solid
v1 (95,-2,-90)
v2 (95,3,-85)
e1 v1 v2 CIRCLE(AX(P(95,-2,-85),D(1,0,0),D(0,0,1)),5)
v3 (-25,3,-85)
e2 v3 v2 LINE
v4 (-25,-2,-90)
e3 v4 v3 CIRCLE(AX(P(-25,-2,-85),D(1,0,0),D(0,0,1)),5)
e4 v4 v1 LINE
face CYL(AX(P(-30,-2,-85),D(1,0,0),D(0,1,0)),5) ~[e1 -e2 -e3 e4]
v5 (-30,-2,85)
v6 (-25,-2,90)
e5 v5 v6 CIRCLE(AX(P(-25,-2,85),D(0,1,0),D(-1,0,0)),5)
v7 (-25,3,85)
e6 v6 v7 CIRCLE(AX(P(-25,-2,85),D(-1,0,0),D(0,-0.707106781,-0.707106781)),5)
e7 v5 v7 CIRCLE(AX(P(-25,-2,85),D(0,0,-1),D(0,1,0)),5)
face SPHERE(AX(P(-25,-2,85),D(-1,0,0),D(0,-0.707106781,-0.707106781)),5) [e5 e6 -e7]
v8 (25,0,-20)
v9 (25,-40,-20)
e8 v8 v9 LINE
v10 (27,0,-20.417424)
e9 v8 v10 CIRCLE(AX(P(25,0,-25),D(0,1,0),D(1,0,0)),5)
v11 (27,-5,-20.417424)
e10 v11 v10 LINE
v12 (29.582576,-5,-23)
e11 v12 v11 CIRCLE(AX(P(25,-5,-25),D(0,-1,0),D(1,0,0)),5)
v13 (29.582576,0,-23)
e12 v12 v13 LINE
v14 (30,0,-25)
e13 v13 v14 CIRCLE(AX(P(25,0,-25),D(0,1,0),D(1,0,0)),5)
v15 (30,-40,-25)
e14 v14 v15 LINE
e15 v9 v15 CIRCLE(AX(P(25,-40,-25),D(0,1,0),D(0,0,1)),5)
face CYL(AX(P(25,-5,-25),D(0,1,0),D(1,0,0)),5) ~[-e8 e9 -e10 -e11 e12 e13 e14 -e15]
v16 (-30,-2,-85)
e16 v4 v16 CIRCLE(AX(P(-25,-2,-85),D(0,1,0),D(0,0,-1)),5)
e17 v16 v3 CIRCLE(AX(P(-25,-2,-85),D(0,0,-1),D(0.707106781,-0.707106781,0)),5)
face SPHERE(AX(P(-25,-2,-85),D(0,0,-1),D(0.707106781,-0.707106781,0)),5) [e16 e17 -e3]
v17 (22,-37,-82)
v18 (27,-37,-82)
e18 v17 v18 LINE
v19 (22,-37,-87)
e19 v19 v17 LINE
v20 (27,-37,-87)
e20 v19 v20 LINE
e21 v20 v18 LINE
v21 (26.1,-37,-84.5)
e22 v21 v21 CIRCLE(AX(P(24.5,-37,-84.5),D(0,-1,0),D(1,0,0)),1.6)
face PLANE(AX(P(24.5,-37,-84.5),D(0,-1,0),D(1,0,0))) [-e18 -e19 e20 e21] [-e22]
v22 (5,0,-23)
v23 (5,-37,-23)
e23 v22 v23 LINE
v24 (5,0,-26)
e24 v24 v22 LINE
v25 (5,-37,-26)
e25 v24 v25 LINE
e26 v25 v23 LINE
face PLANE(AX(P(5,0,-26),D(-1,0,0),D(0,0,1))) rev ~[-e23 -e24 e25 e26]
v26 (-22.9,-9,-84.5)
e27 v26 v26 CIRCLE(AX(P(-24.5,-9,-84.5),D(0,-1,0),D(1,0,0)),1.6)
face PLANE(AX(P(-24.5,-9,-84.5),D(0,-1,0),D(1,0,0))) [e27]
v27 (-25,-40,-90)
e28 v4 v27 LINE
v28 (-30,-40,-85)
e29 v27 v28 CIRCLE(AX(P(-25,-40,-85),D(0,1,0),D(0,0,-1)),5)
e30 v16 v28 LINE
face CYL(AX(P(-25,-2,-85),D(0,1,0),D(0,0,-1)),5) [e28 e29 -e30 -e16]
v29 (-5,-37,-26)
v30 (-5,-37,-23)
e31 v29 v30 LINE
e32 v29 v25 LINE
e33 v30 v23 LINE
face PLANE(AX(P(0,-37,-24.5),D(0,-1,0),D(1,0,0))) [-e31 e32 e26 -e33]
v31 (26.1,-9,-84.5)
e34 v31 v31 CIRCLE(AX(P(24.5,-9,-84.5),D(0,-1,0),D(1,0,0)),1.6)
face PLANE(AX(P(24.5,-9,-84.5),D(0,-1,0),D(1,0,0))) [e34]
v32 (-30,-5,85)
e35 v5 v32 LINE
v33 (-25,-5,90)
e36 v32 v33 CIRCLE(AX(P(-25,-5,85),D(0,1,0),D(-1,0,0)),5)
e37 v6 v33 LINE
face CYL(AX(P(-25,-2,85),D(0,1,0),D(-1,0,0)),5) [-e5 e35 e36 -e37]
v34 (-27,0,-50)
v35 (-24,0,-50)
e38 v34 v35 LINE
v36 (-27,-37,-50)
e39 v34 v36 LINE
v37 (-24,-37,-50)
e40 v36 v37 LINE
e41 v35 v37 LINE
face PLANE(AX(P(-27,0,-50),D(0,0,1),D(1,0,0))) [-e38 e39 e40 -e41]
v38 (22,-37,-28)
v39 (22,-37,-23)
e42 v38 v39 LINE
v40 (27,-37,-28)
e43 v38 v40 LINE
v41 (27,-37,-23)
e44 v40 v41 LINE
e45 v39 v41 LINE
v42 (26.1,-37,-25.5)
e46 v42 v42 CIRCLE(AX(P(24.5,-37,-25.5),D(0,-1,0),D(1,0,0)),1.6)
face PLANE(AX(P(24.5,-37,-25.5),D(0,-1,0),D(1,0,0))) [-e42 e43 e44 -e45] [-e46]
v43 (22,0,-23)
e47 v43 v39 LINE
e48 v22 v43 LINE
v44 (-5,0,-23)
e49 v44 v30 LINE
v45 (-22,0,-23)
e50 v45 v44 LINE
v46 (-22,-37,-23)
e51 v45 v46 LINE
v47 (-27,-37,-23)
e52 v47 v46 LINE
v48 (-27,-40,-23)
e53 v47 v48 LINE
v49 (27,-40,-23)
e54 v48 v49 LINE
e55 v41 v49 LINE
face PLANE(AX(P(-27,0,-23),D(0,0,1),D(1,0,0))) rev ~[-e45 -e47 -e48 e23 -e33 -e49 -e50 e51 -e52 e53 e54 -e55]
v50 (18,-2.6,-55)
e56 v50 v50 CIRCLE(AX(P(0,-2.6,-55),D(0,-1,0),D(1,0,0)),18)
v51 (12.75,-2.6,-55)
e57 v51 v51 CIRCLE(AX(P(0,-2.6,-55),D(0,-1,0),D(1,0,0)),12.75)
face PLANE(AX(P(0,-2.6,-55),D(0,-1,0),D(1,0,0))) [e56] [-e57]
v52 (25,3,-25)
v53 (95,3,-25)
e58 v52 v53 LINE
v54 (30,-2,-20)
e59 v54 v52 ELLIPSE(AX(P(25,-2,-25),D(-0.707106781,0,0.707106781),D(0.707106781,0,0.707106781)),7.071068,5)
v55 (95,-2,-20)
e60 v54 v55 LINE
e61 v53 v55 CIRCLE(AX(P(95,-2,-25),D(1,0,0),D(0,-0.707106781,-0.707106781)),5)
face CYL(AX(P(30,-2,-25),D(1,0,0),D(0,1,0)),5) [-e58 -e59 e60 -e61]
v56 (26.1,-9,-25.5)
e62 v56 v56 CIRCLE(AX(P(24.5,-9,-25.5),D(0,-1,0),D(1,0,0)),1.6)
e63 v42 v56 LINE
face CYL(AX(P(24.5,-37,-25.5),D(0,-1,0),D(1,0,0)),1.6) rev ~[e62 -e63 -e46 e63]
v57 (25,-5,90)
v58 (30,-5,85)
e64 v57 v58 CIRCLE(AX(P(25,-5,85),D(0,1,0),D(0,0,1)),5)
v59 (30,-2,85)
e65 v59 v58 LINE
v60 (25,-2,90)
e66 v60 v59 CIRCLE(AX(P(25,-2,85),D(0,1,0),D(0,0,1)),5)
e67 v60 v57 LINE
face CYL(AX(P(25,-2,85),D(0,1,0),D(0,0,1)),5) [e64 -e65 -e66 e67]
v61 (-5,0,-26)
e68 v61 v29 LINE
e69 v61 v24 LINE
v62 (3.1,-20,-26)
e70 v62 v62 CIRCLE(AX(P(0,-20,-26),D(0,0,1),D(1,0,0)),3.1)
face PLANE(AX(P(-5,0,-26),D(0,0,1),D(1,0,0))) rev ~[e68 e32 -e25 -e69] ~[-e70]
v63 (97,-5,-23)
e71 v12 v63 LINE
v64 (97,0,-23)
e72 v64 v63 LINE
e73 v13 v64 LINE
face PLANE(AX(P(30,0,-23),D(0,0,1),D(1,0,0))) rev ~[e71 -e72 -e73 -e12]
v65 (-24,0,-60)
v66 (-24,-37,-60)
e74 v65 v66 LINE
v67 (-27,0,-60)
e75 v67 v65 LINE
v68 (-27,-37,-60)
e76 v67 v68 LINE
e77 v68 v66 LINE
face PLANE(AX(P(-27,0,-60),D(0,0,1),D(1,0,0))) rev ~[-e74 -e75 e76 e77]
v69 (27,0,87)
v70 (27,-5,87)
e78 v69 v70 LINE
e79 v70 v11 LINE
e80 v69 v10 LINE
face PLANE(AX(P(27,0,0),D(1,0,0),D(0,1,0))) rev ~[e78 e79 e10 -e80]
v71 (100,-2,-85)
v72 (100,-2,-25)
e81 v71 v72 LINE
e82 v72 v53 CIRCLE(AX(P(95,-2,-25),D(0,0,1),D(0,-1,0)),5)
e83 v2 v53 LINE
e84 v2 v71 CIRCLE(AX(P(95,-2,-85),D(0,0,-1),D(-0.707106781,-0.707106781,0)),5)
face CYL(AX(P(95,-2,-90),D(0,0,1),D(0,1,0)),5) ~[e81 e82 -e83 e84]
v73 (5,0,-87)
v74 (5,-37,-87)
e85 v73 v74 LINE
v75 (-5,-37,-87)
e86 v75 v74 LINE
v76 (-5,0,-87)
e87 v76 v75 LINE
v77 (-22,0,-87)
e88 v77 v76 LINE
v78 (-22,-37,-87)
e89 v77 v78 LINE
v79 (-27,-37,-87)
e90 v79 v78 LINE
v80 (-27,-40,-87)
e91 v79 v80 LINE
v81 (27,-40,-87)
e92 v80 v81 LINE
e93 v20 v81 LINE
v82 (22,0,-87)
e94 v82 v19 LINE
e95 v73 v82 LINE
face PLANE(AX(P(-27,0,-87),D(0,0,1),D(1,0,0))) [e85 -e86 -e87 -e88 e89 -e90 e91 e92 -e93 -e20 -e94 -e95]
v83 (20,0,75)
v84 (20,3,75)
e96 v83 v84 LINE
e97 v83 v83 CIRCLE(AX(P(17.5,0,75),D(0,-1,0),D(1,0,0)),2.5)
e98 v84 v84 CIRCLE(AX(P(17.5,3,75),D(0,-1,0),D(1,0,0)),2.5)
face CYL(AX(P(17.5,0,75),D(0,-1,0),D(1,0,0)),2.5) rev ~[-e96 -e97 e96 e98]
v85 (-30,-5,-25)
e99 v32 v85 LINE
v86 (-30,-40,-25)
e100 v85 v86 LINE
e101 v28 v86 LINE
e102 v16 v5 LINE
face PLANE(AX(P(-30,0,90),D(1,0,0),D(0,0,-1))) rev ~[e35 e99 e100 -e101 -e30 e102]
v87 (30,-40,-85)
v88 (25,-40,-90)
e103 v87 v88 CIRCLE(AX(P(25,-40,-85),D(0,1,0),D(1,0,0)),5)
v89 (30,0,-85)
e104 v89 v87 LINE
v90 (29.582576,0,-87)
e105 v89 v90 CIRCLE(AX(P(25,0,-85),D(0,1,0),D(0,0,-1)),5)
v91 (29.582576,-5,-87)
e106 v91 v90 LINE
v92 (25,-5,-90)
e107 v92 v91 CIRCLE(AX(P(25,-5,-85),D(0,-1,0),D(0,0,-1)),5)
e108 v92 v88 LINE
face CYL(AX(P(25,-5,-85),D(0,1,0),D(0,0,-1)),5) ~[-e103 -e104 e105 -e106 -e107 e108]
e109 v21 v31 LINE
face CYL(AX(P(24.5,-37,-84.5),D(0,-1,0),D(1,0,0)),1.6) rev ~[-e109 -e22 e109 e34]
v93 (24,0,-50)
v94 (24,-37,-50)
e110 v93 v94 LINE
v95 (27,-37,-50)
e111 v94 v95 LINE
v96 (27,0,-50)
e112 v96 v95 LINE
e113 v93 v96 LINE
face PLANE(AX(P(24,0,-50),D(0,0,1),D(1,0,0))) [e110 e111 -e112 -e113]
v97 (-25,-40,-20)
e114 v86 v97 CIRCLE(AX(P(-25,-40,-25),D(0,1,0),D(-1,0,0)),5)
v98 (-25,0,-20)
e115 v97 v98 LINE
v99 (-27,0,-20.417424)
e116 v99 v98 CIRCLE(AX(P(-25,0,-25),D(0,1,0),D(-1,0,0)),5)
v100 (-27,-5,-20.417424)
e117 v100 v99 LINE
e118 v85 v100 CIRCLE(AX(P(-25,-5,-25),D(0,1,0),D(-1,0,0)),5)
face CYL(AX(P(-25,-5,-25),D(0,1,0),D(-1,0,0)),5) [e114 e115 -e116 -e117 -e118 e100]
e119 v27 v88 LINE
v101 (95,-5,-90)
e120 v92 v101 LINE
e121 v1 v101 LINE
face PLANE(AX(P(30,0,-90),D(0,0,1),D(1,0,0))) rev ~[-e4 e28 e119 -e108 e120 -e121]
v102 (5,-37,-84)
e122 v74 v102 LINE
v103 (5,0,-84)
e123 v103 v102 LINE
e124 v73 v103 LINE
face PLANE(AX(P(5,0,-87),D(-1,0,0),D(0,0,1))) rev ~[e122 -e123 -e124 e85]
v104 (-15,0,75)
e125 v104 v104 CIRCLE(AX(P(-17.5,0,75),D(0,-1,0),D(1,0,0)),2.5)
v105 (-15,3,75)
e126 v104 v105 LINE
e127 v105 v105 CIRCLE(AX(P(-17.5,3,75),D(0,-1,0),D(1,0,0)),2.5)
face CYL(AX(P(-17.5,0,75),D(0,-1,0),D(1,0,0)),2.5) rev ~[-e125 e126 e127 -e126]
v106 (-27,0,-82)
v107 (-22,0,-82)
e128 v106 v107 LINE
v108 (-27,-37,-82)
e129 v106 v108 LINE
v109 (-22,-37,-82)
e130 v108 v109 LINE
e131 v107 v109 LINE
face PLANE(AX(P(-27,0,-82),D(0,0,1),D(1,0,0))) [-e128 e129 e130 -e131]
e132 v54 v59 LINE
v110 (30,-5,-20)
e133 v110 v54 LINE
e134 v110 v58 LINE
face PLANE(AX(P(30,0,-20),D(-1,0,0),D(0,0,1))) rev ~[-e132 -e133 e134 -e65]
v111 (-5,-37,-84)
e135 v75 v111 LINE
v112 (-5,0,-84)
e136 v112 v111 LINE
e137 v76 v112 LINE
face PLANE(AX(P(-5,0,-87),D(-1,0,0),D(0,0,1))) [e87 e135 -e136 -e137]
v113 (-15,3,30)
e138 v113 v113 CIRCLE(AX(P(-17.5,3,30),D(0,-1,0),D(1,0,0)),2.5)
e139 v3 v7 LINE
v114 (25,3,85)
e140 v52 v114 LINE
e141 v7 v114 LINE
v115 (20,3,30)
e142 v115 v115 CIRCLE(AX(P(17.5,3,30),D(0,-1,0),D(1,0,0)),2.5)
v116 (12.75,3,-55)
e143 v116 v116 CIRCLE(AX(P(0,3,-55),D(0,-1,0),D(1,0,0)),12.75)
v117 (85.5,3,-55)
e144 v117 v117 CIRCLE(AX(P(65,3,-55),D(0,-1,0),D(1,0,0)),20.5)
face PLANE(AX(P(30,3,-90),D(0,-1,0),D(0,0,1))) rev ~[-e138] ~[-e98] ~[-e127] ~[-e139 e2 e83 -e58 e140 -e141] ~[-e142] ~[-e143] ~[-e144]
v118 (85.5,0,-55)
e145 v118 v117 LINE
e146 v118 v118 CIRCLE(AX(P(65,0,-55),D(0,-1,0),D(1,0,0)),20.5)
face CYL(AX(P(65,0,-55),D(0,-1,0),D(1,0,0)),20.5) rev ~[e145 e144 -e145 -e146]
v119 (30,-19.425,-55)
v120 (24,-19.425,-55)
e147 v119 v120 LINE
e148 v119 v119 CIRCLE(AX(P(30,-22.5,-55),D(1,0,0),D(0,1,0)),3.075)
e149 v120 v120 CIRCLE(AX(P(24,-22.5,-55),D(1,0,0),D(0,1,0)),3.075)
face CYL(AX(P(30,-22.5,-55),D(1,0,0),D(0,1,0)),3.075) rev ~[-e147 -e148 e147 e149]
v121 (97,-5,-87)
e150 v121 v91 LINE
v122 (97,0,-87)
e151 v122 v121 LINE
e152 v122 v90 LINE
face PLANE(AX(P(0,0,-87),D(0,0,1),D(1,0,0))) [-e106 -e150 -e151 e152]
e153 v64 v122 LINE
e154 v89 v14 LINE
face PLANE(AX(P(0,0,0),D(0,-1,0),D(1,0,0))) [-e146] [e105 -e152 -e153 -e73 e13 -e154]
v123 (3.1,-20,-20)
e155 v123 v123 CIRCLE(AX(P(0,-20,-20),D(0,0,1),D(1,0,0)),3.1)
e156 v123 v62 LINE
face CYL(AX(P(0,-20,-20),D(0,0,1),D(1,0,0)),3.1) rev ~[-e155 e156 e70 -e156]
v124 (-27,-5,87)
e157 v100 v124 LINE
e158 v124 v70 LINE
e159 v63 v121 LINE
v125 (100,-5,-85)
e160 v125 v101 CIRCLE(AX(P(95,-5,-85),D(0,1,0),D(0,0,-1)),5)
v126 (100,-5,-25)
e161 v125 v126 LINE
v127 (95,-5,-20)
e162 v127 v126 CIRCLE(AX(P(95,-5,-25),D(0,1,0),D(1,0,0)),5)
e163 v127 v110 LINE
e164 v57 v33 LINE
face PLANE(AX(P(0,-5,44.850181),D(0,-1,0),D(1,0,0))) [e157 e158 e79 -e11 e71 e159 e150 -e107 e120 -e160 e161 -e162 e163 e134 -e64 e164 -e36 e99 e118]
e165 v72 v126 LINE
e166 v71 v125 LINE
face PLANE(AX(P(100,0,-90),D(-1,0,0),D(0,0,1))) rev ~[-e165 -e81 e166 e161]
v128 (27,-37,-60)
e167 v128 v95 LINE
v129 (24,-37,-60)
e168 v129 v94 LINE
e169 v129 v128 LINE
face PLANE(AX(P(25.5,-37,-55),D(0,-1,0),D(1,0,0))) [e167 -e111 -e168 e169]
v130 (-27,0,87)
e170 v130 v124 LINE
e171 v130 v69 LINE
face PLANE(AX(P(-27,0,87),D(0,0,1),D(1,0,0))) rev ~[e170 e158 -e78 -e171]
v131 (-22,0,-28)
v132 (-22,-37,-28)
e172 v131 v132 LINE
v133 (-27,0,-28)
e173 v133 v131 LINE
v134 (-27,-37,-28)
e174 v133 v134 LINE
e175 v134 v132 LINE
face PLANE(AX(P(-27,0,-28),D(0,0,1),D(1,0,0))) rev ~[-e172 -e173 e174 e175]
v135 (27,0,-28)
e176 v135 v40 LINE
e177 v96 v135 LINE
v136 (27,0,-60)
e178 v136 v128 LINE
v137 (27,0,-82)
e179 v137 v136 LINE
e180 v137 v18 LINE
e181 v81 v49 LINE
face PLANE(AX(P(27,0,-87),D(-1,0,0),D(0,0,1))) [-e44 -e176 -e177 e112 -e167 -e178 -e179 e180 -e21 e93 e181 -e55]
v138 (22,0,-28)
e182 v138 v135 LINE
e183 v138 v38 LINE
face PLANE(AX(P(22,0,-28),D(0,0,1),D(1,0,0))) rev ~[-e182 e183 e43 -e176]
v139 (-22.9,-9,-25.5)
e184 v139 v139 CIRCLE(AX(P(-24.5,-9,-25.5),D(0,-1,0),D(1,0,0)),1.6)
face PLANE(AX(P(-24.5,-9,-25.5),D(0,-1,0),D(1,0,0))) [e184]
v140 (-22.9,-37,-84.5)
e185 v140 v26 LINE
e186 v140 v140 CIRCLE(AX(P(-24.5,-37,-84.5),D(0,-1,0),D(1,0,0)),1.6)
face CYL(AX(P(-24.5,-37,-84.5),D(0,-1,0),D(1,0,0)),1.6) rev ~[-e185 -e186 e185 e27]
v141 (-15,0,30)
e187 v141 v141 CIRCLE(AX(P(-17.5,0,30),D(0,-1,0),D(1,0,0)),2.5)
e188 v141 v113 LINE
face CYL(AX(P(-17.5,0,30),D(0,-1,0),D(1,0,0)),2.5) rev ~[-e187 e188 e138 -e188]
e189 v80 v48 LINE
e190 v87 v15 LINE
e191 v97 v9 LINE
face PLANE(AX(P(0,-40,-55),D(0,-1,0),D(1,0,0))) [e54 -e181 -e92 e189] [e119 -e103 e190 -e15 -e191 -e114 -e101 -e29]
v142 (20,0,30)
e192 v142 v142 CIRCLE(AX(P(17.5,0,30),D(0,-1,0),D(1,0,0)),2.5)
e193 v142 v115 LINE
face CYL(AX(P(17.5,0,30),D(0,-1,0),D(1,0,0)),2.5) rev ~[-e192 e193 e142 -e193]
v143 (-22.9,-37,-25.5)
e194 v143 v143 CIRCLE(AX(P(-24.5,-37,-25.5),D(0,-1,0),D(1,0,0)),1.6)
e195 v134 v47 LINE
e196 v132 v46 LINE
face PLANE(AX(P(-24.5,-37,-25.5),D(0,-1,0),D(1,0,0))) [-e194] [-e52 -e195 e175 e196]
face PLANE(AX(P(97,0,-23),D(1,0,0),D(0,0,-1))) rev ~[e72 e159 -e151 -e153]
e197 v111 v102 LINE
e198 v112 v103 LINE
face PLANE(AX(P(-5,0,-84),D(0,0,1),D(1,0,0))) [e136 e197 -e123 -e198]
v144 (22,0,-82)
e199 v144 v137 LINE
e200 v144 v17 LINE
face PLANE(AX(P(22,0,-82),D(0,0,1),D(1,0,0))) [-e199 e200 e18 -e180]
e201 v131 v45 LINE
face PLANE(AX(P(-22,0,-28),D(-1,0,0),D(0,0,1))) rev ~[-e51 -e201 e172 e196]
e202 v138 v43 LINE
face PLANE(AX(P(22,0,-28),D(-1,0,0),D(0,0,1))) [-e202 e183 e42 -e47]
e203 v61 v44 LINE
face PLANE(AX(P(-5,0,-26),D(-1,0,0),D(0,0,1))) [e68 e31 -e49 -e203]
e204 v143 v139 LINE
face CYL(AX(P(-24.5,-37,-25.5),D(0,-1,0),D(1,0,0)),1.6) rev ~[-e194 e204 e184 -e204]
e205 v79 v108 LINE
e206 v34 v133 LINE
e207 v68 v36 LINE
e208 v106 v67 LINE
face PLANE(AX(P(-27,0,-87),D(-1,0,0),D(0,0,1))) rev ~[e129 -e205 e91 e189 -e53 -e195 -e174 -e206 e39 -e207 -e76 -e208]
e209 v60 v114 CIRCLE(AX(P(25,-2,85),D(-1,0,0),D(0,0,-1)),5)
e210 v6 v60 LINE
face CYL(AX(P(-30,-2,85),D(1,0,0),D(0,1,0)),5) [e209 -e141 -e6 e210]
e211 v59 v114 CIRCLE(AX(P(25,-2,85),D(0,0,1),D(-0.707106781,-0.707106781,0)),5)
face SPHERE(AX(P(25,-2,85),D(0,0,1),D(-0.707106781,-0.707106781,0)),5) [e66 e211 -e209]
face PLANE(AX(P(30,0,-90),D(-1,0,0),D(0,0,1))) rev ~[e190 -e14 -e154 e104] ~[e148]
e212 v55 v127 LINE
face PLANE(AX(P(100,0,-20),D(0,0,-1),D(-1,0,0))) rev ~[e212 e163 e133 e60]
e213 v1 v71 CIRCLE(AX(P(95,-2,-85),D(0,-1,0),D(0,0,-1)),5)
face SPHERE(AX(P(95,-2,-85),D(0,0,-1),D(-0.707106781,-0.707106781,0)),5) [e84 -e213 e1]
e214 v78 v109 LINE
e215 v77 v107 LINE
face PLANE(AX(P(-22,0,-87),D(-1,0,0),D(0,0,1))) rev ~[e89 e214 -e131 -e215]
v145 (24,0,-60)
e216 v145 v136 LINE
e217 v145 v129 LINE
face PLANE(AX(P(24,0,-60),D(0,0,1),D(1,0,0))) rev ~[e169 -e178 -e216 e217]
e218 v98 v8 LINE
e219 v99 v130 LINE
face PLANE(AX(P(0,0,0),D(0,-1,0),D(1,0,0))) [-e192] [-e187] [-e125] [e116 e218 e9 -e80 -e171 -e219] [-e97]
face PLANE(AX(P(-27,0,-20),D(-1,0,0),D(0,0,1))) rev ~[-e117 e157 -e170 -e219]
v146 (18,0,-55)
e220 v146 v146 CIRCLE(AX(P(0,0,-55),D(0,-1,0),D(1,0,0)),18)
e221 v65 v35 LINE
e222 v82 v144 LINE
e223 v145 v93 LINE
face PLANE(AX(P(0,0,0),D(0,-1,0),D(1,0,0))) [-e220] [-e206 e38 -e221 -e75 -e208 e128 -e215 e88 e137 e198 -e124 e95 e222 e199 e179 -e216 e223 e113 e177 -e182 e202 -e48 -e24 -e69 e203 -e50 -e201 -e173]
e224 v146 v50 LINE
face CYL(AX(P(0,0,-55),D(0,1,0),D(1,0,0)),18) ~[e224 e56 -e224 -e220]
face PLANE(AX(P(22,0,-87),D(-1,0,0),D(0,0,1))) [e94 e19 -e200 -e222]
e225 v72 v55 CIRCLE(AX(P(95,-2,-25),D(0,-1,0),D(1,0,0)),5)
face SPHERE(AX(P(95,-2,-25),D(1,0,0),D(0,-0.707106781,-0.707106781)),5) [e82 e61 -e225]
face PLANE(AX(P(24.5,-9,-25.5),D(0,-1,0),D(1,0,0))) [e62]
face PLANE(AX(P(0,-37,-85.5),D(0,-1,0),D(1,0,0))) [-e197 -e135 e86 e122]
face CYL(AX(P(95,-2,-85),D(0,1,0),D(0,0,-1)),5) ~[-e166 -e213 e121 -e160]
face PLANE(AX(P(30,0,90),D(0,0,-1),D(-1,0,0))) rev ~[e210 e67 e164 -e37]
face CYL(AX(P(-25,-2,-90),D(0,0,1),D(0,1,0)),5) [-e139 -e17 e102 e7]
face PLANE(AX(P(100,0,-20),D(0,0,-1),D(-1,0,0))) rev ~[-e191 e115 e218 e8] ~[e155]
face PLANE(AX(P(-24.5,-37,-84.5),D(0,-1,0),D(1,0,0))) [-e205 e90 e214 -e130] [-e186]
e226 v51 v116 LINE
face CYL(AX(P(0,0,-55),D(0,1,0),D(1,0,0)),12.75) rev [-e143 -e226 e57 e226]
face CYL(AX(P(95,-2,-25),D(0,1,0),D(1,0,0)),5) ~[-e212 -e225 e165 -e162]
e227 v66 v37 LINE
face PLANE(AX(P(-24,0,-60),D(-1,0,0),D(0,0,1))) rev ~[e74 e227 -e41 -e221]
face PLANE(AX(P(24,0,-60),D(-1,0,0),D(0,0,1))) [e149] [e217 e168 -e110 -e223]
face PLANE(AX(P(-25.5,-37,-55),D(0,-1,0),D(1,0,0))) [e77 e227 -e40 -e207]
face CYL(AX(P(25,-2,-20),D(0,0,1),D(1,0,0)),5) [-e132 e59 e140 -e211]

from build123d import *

# Parameters (mm, degrees)
F0_W          = 60
F0_H          = 180
F0_R          = 12.75
F0_R_2        = 2.5
F1_DEPTH      = 3
F2_R          = 18
F2_R_2        = 12.75
F3_DEPTH      = 2.6
F4_W          = 60
F4_H          = 70
F4_W_2        = 54
F4_H_2        = 64
F5_DEPTH      = 40
F6_W          = 5
F6_H          = 5
F6_W_2        = 10
F6_H_2        = 3
F6_W_3        = 3
F6_H_3        = 10
F7_DEPTH      = 37
F8_R          = 1.6
F9_DEPTH      = 28
F10_W         = 3
F10_H         = 70
F11_DEPTH     = 70
F13_R         = 20.5
F14_DEPTH     = 3
F16_DEPTH     = 5
F17_R         = 3.075
F18_DEPTH     = 6
F19_R         = 3.1
F20_DEPTH     = 6
F22_DEPTH     = 5
F23_R         = 5
F24_T1_DEPTH  = 47.5
F24_T3_DEPTH  = 50.5
F24_T5_DEPTH  = 15.5
F24_S9_W      = 5.1
F24_S9_H      = 5.1
F24_T10_DEPTH = 5.1
F24_S15_W     = 5.1
F24_S15_H     = 5.1
F24_T16_DEPTH = 5.1
F24_S21_W     = 5.1
F24_S21_H     = 5.1
F24_T22_DEPTH = 5.1
F24_S27_W     = 5.1
F24_S27_H     = 5.1
F24_T28_DEPTH = 5.1
F24_S33_W     = 5.1
F24_S33_H     = 5.1
F24_T34_DEPTH = 5.1
F24_T40_DEPTH = 60
F24_T46_DEPTH = 60
F24_T52_DEPTH = 60
F24_T58_DEPTH = 60


# Not quite as in the source:
# - a fillet or chamfer that OpenCascade refuses, or shapes differently, is made with other operations: its cross-section is extruded or revolved along the edge and cut away or added


with BuildPart() as f1:
    # F0 (on Front) → F1 (new body)
    with BuildSketch(Plane.XZ):
        Rectangle(F0_W, F0_H)
        with Locations((0, -55)):
            Circle(F0_R, mode=Mode.SUBTRACT)
        with Locations((-17.5, 30)):
            Circle(F0_R_2, mode=Mode.SUBTRACT)
        with Locations((-17.5, 75)):
            Circle(F0_R_2, mode=Mode.SUBTRACT)
        with Locations((17.5, 30)):
            Circle(F0_R_2, mode=Mode.SUBTRACT)
        with Locations((17.5, 75)):
            Circle(F0_R_2, mode=Mode.SUBTRACT)
    extrude(amount=-F1_DEPTH)

    # F2 (on face) → F3 (join)
    with BuildSketch(Plane.XZ):
        with Locations((0, -55)):
            Circle(F2_R)
        with Locations((0, -55)):
            Circle(F2_R_2, mode=Mode.SUBTRACT)
    extrude(amount=F3_DEPTH)

    # F4 (on face) → F5 (join)
    with BuildSketch(Plane.XZ):
        with Locations((0, -55)):
            Rectangle(F4_W, F4_H)
        with Locations((0, -55)):
            Rectangle(F4_W_2, F4_H_2, mode=Mode.SUBTRACT)
    extrude(amount=F5_DEPTH)

    # F6 (on face) → F7 (join)
    with BuildSketch(Plane.XZ):
        with Locations((-24.5, -25.5)):
            Rectangle(F6_W, F6_H)
        with Locations((0, -24.5)):
            Rectangle(F6_W_2, F6_H_2)
        with Locations((24.5, -25.5)):
            Rectangle(F6_W, F6_H)
        with Locations((25.5, -55)):
            Rectangle(F6_W_3, F6_H_3)
        with Locations((-25.5, -55)):
            Rectangle(F6_W_3, F6_H_3)
        with Locations((24.5, -84.5)):
            Rectangle(F6_W, F6_H)
        with Locations((0, -85.5)):
            Rectangle(F6_W_2, F6_H_2)
        with Locations((-24.5, -84.5)):
            Rectangle(F6_W, F6_H)
    extrude(amount=F7_DEPTH)

    # F8 (on face) → F9 (cut)
    with BuildSketch(Plane.XZ.offset(37)):
        with Locations((24.5, -25.5)):
            Circle(F8_R)
        with Locations((-24.5, -25.5)):
            Circle(F8_R)
        with Locations((24.5, -84.5)):
            Circle(F8_R)
        with Locations((-24.5, -84.5)):
            Circle(F8_R)
    extrude(amount=-F9_DEPTH, mode=Mode.SUBTRACT)

    # F10 (on face) → F11 (join)
    with BuildSketch(Plane.YZ.offset(30)):
        with Locations((1.5, -55)):
            Rectangle(F10_W, F10_H)
    extrude(amount=F11_DEPTH)

    # F13 (on face) → F14 (cut, through all)
    with BuildSketch(Plane.XZ):
        with Locations((65, -55)):
            Circle(F13_R)
    extrude(amount=-F14_DEPTH, mode=Mode.SUBTRACT)

    # F15 (on face) → F16 (join)
    with BuildSketch(Plane.XZ):
        Polygon((100, -20), (30, -20), (30, -23), (97, -23), (97, -87), (30, -87), (30, -90), (100, -90), (100, -87), (100, -23), align=None)
    extrude(amount=F16_DEPTH)

    # F17 (on face) → F18 (cut, through all)
    with BuildSketch(Plane.YZ.offset(30)):
        with Locations((-22.5, -55)):
            Circle(F17_R)
    extrude(amount=-F18_DEPTH, mode=Mode.SUBTRACT)

    # F19 (on face) → F20 (cut, through all)
    with BuildSketch(Plane.XY.offset(-20)):
        with Locations((0, -20)):
            Circle(F19_R)
    extrude(amount=-F20_DEPTH, mode=Mode.SUBTRACT)

    # F21 (on face) → F22 (join)
    with BuildSketch(Plane.XZ):
        Polygon((30, -20), (30, 90), (27, 90), (21.6846410185, 90), (-27, 90), (-30, 90), (-30, -20), (-27, -20), (-27, 87), (27, 87), (27, -20), align=None)
    extrude(amount=F22_DEPTH)

    # F23
    f23_edges = [f1.edges().sort_by_distance(p)[0] for p in [
        (35, 3, -90),
        (-30, 3, 0),
        (0, 3, 90),
        (30, 3, 35),
        (65, 3, -20),
        (100, 3, -55),
    ]]
    fillet(f23_edges, radius=F23_R)

    # F24: fillet of radius 5 on 8 edges, made by hand

    # F24_s2 → F24_t1 (cut)
    with BuildSketch(Plane.XZ.offset(5)):
        with BuildLine():
            ThreePointArc((30, -25), (28.5355339059, -21.4644660941), (25, -20))
            Line((25, -20), (30, -20))
            Line((30, -20), (30, -25))
        make_face()
        with BuildLine():
            ThreePointArc((-30, -25), (-28.5355339059, -21.4644660941), (-25, -20))
            Line((-25, -20), (-30, -20))
            Line((-30, -20), (-30, -25))
        make_face()
        with BuildLine():
            ThreePointArc((25, -90), (28.5355339059, -88.5355339059), (30, -85))
            Line((30, -85), (30, -90))
            Line((30, -90), (25, -90))
        make_face()
    extrude(amount=F24_T1_DEPTH, mode=Mode.SUBTRACT)

    # F24_s4 → F24_t3 (cut)
    with BuildSketch(Plane.XZ.offset(2)):
        with BuildLine():
            ThreePointArc((-25, -90), (-28.5355339059, -88.5355339059), (-30, -85))
            Line((-30, -85), (-30, -90))
            Line((-30, -90), (-25, -90))
        make_face()
    extrude(amount=F24_T3_DEPTH, mode=Mode.SUBTRACT)

    # F24_s6 → F24_t5 (cut)
    with BuildSketch(Plane.XZ.offset(2)):
        with BuildLine():
            ThreePointArc((100, -25), (98.5355339059, -21.4644660941), (95, -20))
            Line((95, -20), (100, -20))
            Line((100, -20), (100, -25))
        make_face()
        with BuildLine():
            ThreePointArc((95, -90), (98.5355339059, -88.5355339059), (100, -85))
            Line((100, -85), (100, -90))
            Line((100, -90), (95, -90))
        make_face()
        with BuildLine():
            ThreePointArc((25, 90), (28.5355339059, 88.5355339059), (30, 85))
            Line((30, 85), (30, 90))
            Line((30, 90), (25, 90))
        make_face()
        with BuildLine():
            ThreePointArc((-30, 85), (-28.5355339059, 88.5355339059), (-25, 90))
            Line((-25, 90), (-30, 90))
            Line((-30, 90), (-30, 85))
        make_face()
    extrude(amount=F24_T5_DEPTH, mode=Mode.SUBTRACT)


with BuildPart() as f24_tool8:
    # F24_s9 → F24_t10 (new body)
    with BuildSketch(Plane.YZ.offset(-25)):
        with Locations((0.55, 87.55)):
            Rectangle(F24_S9_W, F24_S9_H)
    extrude(amount=-F24_T10_DEPTH)

    # F24_s11 → F24_t12 (revolve, cut)
    with BuildSketch(Plane(origin=(-25, -2, 85), x_dir=(0, -0.7071067812, -0.7071067812), z_dir=(0, 0.7071067812, -0.7071067812))):
        with BuildLine():
            ThreePointArc((0, -5), (5, 0), (0, 5))
            Line((0, 5), (0, -5))
        make_face()
    revolve(axis=Axis((-25, -2, 85), (-1, 0, 0)), mode=Mode.SUBTRACT)


with BuildPart() as f1_1:
    add(f1.part)

    # F24_t7: cut F24_tool8
    add(f24_tool8.part, mode=Mode.SUBTRACT)


with BuildPart() as f24_tool14:
    # F24_s15 → F24_t16 (new body)
    with BuildSketch(Plane.XY.offset(85)):
        with Locations((27.55, 0.55)):
            Rectangle(F24_S15_W, F24_S15_H)
    extrude(amount=F24_T16_DEPTH)

    # F24_s17 → F24_t18 (revolve, cut)
    with BuildSketch(Plane(origin=(25, -2, 85), x_dir=(-0.7071067812, -0.7071067812, 0), z_dir=(-0.7071067812, 0.7071067812, 0))):
        with BuildLine():
            ThreePointArc((0, -5), (5, 0), (0, 5))
            Line((0, 5), (0, -5))
        make_face()
    revolve(axis=Axis((25, -2, 85), (0, 0, 1)), mode=Mode.SUBTRACT)


with BuildPart() as f1_2:
    add(f1_1.part)

    # F24_t13: cut F24_tool14
    add(f24_tool14.part, mode=Mode.SUBTRACT)


with BuildPart() as f24_tool20:
    # F24_s21 → F24_t22 (new body)
    with BuildSketch(Plane.XY.offset(-85)):
        with Locations((97.55, 0.55)):
            Rectangle(F24_S21_W, F24_S21_H)
    extrude(amount=-F24_T22_DEPTH)

    # F24_s23 → F24_t24 (revolve, cut)
    with BuildSketch(Plane(origin=(95, -2, -85), x_dir=(-0.7071067812, -0.7071067812, 0), z_dir=(0.7071067812, -0.7071067812, 0))):
        with BuildLine():
            ThreePointArc((0, -5), (5, 0), (0, 5))
            Line((0, 5), (0, -5))
        make_face()
    revolve(axis=Axis((95, -2, -85), (0, 0, -1)), mode=Mode.SUBTRACT)


with BuildPart() as f1_3:
    add(f1_2.part)

    # F24_t19: cut F24_tool20
    add(f24_tool20.part, mode=Mode.SUBTRACT)


with BuildPart() as f24_tool26:
    # F24_s27 → F24_t28 (new body)
    with BuildSketch(Plane.YZ.offset(95)):
        with Locations((0.55, -22.45)):
            Rectangle(F24_S27_W, F24_S27_H)
    extrude(amount=F24_T28_DEPTH)

    # F24_s29 → F24_t30 (revolve, cut)
    with BuildSketch(Plane(origin=(95, -2, -25), x_dir=(0, -0.7071067812, -0.7071067812), z_dir=(0, -0.7071067812, 0.7071067812))):
        with BuildLine():
            ThreePointArc((0, -5), (5, 0), (0, 5))
            Line((0, 5), (0, -5))
        make_face()
    revolve(axis=Axis((95, -2, -25), (1, 0, 0)), mode=Mode.SUBTRACT)


with BuildPart() as f1_4:
    add(f1_3.part)

    # F24_t25: cut F24_tool26
    add(f24_tool26.part, mode=Mode.SUBTRACT)


with BuildPart() as f24_tool32:
    # F24_s33 → F24_t34 (new body)
    with BuildSketch(Plane.XY.offset(-85)):
        with Locations((-27.55, 0.55)):
            Rectangle(F24_S33_W, F24_S33_H)
    extrude(amount=-F24_T34_DEPTH)

    # F24_s35 → F24_t36 (revolve, cut)
    with BuildSketch(Plane(origin=(-25, -2, -85), x_dir=(0.7071067812, -0.7071067812, 0), z_dir=(0.7071067812, 0.7071067812, 0))):
        with BuildLine():
            ThreePointArc((0, -5), (5, 0), (0, 5))
            Line((0, 5), (0, -5))
        make_face()
    revolve(axis=Axis((-25, -2, -85), (0, 0, -1)), mode=Mode.SUBTRACT)


with BuildPart() as f1_5:
    add(f1_4.part)

    # F24_t31: cut F24_tool32
    add(f24_tool32.part, mode=Mode.SUBTRACT)


with BuildPart() as f24_tool38:
    # F24_s39 → F24_t40 (new body)
    with BuildSketch(Plane.XZ.offset(-7.5)):
        with BuildLine():
            ThreePointArc((30, -25), (28.5355339059, -21.4644660941), (25, -20))
            Line((25, -20), (30, -20))
            Line((30, -20), (30, -25))
        make_face()
    extrude(amount=F24_T40_DEPTH)

    split(bisect_by=Plane.XY.offset(-23), keep=Keep.BOTTOM)

    split(bisect_by=Plane.XZ, keep=Keep.TOP)


with BuildPart() as f1_6:
    add(f1_5.part)

    # F24_t37: cut F24_tool38
    add(f24_tool38.part, mode=Mode.SUBTRACT)


with BuildPart() as f24_tool44:
    # F24_s45 → F24_t46 (new body)
    with BuildSketch(Plane.XZ.offset(-7.5)):
        with BuildLine():
            ThreePointArc((30, -25), (28.5355339059, -21.4644660941), (25, -20))
            Line((25, -20), (30, -20))
            Line((30, -20), (30, -25))
        make_face()
    extrude(amount=F24_T46_DEPTH)

    split(bisect_by=Plane.XZ, keep=Keep.TOP)

    split(bisect_by=Plane.YZ.offset(27), keep=Keep.BOTTOM)


with BuildPart() as f1_7:
    add(f1_6.part)

    # F24_t43: cut F24_tool44
    add(f24_tool44.part, mode=Mode.SUBTRACT)


with BuildPart() as f24_tool50:
    # F24_s51 → F24_t52 (new body)
    with BuildSketch(Plane.XZ.offset(-7.5)):
        with BuildLine():
            ThreePointArc((-30, -25), (-28.5355339059, -21.4644660941), (-25, -20))
            Line((-25, -20), (-30, -20))
            Line((-30, -20), (-30, -25))
        make_face()
    extrude(amount=F24_T52_DEPTH)

    split(bisect_by=Plane.XZ, keep=Keep.TOP)

    split(bisect_by=Plane.YZ.offset(-27), keep=Keep.TOP)


with BuildPart() as f1_8:
    add(f1_7.part)

    # F24_t49: cut F24_tool50
    add(f24_tool50.part, mode=Mode.SUBTRACT)


with BuildPart() as f24_tool56:
    # F24_s57 → F24_t58 (new body)
    with BuildSketch(Plane.XZ.offset(-7.5)):
        with BuildLine():
            ThreePointArc((25, -90), (28.5355339059, -88.5355339059), (30, -85))
            Line((30, -85), (30, -90))
            Line((30, -90), (25, -90))
        make_face()
    extrude(amount=F24_T58_DEPTH)

    split(bisect_by=Plane.XY.offset(-87), keep=Keep.TOP)

    split(bisect_by=Plane.XZ, keep=Keep.TOP)


with BuildPart() as f1_9:
    add(f1_8.part)

    # F24_t55: cut F24_tool56
    add(f24_tool56.part, mode=Mode.SUBTRACT)


solid = f1_9.part
